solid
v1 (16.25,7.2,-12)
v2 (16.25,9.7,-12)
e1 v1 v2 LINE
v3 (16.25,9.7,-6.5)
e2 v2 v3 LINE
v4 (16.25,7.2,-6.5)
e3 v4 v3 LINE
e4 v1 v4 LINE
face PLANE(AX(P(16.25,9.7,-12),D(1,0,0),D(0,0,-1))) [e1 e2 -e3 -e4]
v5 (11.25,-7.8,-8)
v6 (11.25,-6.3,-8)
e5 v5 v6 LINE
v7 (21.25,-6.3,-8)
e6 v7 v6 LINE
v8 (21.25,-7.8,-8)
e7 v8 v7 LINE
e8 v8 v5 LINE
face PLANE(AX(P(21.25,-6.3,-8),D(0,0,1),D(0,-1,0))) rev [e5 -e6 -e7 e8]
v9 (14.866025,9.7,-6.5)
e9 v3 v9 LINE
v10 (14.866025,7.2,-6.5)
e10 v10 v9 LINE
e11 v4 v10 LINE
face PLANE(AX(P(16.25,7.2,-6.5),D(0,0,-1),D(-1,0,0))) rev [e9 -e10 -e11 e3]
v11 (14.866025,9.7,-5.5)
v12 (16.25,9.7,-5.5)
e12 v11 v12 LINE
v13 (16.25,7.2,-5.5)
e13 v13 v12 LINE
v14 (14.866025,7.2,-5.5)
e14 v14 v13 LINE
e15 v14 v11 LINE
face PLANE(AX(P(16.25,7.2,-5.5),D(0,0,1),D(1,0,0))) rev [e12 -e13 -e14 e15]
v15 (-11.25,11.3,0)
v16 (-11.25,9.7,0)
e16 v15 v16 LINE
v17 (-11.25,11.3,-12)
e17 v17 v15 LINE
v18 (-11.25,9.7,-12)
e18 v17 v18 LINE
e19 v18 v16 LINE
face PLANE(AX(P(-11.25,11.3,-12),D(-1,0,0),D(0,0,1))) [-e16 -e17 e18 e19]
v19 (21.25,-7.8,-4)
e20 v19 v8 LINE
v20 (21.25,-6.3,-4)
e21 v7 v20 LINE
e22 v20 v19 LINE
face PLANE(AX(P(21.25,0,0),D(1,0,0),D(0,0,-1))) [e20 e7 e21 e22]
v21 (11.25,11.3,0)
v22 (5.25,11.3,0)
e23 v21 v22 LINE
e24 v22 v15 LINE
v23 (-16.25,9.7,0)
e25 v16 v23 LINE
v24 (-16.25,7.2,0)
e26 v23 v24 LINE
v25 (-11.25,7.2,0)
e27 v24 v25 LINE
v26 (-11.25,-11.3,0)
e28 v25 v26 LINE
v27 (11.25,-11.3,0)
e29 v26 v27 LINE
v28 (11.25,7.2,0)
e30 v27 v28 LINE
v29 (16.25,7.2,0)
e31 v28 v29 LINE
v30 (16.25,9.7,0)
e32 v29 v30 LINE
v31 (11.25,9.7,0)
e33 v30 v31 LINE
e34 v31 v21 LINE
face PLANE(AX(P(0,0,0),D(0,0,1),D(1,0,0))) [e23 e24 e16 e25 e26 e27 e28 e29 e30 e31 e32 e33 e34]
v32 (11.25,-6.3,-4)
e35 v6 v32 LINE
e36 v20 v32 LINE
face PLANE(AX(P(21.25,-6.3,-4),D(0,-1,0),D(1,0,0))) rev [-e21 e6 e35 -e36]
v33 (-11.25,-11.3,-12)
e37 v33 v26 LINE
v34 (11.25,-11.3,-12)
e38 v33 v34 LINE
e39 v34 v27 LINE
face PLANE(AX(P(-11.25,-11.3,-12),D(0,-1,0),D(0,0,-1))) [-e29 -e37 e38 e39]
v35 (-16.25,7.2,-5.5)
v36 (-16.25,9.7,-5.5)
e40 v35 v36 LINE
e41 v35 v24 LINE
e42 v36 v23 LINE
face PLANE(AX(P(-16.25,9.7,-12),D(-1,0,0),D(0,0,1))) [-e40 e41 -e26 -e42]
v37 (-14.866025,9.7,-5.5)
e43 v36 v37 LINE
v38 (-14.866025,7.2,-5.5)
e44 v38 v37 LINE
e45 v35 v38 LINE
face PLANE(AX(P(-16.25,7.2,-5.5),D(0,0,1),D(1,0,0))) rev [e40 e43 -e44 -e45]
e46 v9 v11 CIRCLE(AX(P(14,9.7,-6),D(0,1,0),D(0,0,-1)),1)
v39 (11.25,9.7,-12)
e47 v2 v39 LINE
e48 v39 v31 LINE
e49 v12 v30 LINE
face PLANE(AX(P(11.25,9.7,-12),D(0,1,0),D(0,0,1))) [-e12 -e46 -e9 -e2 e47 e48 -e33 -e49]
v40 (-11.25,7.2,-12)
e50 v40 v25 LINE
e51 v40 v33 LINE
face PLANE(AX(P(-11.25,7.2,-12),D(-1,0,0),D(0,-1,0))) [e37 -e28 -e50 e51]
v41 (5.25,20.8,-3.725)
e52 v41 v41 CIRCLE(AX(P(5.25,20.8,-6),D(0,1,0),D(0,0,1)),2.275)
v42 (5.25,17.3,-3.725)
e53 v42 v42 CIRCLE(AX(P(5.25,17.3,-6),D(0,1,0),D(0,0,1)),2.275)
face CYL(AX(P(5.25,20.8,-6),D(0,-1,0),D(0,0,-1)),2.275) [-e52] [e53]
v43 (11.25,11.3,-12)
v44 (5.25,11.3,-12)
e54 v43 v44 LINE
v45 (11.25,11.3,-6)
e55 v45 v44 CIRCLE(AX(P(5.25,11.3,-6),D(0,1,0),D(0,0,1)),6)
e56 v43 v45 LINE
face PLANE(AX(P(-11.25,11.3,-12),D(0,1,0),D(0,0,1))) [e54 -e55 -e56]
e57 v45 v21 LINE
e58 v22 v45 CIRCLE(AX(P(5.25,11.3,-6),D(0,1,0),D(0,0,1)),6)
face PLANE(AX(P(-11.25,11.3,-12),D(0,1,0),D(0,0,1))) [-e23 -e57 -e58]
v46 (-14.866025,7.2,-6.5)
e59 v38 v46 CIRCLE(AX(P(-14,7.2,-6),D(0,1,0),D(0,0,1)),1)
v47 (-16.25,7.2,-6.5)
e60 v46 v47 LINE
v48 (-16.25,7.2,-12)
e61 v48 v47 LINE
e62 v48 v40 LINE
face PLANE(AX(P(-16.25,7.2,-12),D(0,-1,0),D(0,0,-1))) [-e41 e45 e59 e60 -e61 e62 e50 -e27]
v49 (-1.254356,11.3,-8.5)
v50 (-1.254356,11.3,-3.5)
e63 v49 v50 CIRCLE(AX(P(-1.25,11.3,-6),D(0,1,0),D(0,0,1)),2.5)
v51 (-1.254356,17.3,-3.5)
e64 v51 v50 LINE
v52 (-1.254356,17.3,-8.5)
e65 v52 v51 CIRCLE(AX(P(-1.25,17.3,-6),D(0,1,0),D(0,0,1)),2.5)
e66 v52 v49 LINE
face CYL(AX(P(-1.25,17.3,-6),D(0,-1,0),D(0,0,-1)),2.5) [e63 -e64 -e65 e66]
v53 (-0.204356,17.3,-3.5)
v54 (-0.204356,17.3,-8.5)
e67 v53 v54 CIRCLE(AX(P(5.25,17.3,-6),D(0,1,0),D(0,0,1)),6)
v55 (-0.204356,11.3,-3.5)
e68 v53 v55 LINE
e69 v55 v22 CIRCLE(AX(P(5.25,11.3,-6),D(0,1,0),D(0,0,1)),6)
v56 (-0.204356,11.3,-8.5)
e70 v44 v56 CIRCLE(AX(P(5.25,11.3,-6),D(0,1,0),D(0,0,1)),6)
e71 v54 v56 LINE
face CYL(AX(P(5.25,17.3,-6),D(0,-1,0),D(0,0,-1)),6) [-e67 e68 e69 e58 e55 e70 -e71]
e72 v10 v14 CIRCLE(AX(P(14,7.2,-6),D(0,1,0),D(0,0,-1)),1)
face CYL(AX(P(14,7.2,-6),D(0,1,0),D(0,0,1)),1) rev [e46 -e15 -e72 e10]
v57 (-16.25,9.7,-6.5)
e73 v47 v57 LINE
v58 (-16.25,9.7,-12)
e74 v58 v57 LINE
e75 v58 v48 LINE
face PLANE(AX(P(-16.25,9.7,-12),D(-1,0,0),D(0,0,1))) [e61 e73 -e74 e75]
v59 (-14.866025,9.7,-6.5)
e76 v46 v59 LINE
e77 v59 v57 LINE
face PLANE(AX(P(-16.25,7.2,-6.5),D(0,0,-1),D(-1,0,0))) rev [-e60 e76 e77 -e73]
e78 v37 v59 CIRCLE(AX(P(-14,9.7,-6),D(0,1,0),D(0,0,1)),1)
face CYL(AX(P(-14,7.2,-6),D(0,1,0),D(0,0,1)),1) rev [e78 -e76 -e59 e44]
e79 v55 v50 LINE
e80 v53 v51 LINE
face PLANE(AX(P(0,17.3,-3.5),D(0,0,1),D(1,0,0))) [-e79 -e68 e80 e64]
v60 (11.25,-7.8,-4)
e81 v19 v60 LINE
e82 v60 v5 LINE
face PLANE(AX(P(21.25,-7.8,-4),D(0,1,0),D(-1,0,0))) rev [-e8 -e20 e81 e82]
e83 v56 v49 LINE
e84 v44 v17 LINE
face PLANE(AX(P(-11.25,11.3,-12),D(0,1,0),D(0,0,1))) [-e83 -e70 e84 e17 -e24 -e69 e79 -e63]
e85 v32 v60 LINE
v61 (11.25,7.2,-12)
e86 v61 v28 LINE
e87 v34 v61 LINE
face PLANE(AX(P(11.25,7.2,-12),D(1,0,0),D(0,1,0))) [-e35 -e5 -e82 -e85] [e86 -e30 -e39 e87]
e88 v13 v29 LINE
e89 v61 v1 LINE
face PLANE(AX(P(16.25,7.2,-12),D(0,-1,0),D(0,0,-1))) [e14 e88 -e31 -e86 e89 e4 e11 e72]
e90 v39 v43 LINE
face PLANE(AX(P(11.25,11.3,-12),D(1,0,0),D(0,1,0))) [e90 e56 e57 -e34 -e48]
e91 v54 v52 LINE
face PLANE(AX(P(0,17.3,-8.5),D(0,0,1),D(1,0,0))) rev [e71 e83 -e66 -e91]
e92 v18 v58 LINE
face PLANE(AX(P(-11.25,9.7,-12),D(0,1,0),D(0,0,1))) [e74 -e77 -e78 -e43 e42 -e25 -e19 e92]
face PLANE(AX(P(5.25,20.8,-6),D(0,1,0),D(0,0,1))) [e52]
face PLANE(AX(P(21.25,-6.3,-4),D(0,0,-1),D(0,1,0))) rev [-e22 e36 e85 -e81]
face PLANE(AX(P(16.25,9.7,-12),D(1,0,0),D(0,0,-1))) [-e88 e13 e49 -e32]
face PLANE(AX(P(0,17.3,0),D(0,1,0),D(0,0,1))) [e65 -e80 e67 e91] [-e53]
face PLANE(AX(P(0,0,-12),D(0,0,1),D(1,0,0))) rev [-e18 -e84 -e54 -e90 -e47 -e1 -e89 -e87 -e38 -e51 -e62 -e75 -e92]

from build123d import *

# Parameters (mm, degrees)
BOSS_EXTRUDE1_DEPTH = 12
SKETCH2_W           = 4
SKETCH2_H           = 1.5
BOSS_EXTRUDE2_DEPTH = 10
CUT_EXTRUDE1_DEPTH  = 2.5
BOSS_EXTRUDE4_DEPTH = 6
SKETCH6_R           = 2.275
BOSS_EXTRUDE5_DEPTH = 3.5


# Read off the part's stored shape, not the designer's step: Boss-Extrude4
with BuildPart() as part:
    # Sketch1 → Boss-Extrude1 (new body)
    with BuildSketch(Plane.XY):
        Polygon((-11.25, 11.3), (11.25, 11.3), (11.25, 9.7), (16.25, 9.7), (16.25, 7.2), (11.25, 7.2), (11.25, -11.3), (-11.25, -11.3), (-11.25, 7.2), (-16.25, 7.2), (-16.25, 9.7), (-11.25, 9.7), align=None)
    extrude(amount=-BOSS_EXTRUDE1_DEPTH)

    # Sketch2 → Boss-Extrude2 (add)
    with BuildSketch(Plane(origin=(11.25, 0, 0), x_dir=(0, 0, -1), z_dir=(1, 0, 0))):
        with Locations((6, -7.05)):
            Rectangle(SKETCH2_W, SKETCH2_H)
    extrude(amount=BOSS_EXTRUDE2_DEPTH)

    # Sketch3 → Cut-Extrude1 (cut)
    with BuildSketch(Plane(origin=(0, 9.7, 0), x_dir=(1, 0, 0), z_dir=(0, 1, 0))):
        with BuildLine():
            Line((-16.25, 6.5), (-14.866025404, 6.5))
            ThreePointArc((-14.866025404, 6.5), (-13, 6), (-14.866025404, 5.5))
            Line((-14.866025404, 5.5), (-16.25, 5.5))
            Line((-16.25, 5.5), (-16.25, 6.5))
        make_face()
        with BuildLine():
            Line((16.25, 6.5), (14.866025404, 6.5))
            ThreePointArc((14.866025404, 6.5), (13, 6), (14.866025404, 5.5))
            Line((14.866025404, 5.5), (16.25, 5.5))
            Line((16.25, 5.5), (16.25, 6.5))
        make_face()
    extrude(amount=-CUT_EXTRUDE1_DEPTH, mode=Mode.SUBTRACT)

    # Boss-Extrude4 outline → Boss-Extrude4 (add)
    with BuildSketch(Plane(origin=(0, 11.3, 0), x_dir=(1, 0, 0), z_dir=(0, 1, 0))):
        with BuildLine():
            Line((-0.204356057, 8.5), (-1.254356051, 8.499996205))
            ThreePointArc((-1.254356051, 8.499996205), (-3.75, 6), (-1.254356051, 3.500003795))
            Line((-1.254356051, 3.500003795), (-0.204356057, 3.5))
            ThreePointArc((-0.204356057, 3.5), (11.25, 6), (-0.204356057, 8.5))
        make_face()
    extrude(amount=BOSS_EXTRUDE4_DEPTH)

    # Sketch6 → Boss-Extrude5 (add)
    with BuildSketch(Plane(origin=(0, 17.3, 0), x_dir=(1, 0, 0), z_dir=(0, 1, 0))):
        with Locations(Location((5.25, 6, 0), (0, 0, 270))):
            Circle(SKETCH6_R)
    extrude(amount=BOSS_EXTRUDE5_DEPTH)


solid = part.part
